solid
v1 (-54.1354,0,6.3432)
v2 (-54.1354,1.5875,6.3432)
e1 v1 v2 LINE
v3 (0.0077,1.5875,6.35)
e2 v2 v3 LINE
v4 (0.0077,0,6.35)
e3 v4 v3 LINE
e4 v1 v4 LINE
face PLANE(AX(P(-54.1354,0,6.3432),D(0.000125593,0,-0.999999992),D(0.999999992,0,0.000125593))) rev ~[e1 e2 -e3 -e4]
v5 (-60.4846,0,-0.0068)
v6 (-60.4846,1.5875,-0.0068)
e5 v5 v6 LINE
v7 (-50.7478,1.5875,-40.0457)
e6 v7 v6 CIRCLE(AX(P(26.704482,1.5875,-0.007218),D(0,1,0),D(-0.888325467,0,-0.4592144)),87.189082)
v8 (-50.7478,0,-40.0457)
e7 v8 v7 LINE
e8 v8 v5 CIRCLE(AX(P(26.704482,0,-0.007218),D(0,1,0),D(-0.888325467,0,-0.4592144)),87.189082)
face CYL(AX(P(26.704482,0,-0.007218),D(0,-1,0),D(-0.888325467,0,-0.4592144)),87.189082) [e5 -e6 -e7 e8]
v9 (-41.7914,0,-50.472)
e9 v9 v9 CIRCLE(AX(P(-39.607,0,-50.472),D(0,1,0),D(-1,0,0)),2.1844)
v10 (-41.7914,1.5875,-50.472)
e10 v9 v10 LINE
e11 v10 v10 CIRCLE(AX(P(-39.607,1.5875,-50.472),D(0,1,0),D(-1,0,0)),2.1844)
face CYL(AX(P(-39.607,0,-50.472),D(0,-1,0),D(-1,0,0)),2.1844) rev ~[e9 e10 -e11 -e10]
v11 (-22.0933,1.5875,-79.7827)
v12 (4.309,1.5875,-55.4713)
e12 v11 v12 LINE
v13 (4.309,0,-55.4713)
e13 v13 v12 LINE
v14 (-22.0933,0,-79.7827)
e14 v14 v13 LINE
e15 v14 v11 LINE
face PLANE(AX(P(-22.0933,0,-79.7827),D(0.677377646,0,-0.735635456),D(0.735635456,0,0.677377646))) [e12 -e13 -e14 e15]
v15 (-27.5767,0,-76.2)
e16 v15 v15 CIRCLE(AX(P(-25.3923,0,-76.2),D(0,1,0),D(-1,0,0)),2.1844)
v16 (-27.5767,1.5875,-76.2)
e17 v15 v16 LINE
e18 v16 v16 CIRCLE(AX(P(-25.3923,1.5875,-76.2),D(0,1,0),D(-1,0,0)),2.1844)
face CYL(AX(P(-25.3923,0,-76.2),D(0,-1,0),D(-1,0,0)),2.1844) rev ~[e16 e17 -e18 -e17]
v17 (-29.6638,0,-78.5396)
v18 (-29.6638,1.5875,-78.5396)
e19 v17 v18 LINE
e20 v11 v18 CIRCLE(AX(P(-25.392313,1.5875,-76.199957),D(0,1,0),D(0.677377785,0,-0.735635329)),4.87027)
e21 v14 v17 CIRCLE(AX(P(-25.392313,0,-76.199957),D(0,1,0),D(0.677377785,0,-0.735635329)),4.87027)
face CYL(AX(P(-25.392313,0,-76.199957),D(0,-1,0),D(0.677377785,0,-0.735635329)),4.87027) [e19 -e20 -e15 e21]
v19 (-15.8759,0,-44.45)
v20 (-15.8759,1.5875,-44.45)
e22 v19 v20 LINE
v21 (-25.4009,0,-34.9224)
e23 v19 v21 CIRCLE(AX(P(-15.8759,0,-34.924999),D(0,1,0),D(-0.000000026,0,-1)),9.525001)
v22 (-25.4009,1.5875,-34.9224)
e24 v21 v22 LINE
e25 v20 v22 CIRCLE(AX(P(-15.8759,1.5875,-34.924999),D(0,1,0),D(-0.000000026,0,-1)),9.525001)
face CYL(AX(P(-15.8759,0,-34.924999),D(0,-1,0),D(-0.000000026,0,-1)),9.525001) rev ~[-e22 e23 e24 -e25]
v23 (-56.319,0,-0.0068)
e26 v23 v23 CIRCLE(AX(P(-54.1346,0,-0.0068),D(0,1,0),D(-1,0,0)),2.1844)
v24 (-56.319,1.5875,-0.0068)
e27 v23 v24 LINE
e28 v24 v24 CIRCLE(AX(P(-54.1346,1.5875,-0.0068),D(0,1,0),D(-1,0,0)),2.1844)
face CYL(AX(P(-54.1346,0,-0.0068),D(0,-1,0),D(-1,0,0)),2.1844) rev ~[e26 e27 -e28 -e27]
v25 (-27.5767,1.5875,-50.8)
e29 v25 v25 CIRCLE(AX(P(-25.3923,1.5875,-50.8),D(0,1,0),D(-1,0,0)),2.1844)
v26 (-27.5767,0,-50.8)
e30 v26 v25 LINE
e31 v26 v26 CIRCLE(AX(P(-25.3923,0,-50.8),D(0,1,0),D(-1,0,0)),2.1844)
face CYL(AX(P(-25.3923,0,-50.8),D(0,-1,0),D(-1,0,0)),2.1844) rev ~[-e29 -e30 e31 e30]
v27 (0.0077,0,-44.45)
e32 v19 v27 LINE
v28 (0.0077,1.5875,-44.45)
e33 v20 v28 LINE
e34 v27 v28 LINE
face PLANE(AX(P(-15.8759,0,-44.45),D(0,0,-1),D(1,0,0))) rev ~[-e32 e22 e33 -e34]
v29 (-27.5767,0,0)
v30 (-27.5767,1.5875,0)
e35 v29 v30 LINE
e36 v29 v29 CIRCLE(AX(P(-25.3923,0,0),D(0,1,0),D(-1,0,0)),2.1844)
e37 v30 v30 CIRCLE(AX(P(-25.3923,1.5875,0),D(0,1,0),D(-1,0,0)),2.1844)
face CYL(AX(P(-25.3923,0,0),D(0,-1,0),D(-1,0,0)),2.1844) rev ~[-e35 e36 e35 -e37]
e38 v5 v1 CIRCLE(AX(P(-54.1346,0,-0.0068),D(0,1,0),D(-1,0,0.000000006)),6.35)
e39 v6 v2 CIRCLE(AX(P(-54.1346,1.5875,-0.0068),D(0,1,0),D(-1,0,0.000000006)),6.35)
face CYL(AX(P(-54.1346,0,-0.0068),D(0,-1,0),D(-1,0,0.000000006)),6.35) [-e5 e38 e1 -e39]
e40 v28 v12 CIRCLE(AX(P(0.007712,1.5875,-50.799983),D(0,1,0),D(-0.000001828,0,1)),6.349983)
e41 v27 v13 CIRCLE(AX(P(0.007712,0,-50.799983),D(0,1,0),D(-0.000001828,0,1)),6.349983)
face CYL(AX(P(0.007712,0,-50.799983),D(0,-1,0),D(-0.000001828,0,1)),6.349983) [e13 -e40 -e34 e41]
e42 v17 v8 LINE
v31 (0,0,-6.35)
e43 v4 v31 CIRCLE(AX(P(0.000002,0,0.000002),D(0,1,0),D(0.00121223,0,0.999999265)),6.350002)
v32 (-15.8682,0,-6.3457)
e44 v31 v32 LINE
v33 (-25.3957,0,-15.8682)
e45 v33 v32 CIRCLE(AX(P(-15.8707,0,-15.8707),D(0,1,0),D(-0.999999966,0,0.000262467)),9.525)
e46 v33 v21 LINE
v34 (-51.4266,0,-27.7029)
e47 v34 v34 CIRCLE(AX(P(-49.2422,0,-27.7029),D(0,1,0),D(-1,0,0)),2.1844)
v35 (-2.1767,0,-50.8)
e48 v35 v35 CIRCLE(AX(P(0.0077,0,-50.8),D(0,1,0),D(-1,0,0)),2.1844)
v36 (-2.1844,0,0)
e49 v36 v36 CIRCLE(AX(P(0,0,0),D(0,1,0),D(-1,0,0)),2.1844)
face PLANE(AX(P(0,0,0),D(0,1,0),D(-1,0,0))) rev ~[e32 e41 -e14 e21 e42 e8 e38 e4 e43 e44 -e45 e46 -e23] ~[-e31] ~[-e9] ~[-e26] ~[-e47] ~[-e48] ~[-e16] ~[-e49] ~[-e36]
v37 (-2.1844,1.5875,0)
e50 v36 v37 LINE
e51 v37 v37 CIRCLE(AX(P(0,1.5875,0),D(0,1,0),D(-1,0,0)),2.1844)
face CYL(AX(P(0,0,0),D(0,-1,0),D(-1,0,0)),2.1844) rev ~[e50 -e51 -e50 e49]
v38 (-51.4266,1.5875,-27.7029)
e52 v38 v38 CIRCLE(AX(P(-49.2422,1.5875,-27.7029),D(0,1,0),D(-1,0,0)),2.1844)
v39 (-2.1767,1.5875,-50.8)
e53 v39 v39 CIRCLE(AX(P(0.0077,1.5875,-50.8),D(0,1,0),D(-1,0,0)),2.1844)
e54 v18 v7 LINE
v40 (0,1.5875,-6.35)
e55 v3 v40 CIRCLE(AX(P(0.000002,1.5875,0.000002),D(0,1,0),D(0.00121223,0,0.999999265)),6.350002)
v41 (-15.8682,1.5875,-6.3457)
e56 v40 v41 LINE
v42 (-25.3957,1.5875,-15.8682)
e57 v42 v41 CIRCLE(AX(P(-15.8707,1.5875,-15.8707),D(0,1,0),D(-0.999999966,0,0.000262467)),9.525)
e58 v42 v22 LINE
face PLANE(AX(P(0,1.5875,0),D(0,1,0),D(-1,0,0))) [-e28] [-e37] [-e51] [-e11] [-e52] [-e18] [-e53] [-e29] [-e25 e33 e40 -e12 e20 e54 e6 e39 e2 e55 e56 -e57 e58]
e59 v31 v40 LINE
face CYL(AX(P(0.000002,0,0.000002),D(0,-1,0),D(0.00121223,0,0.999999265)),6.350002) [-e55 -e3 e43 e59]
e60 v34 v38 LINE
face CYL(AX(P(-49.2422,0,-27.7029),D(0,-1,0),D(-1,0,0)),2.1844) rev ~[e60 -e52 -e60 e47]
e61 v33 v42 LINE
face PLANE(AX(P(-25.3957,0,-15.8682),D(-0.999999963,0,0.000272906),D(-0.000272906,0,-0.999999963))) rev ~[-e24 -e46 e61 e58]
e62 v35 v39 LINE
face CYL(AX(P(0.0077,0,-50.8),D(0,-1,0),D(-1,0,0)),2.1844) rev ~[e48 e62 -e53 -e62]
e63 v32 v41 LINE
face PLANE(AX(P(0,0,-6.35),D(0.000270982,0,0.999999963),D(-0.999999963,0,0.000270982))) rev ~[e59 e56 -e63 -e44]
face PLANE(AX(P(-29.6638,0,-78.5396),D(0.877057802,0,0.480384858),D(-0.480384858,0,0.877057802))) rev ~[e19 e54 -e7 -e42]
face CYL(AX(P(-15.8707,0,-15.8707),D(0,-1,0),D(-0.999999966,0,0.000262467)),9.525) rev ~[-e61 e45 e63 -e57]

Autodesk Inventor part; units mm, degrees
ref_plane "YZ Plane" through (0, 0, 0) normal (1, 0, 0) x (0, 1, 0)
ref_plane "XZ Plane" through (0, 0, 0) normal (0, 1, 0) x (-1, 0, 0)
ref_plane "XY Plane" through (0, 0, 0) normal (0, 0, 1) x (1, 0, 0)
sketch "main" plane through (0, 0, 0) normal (0, 0, 1) x (1, 0, 0)
  line L0 (12.0188, -14.2552) -> (33.1027, 24.2387)
  circle A0 centre (21.9619, 13.8124) radius 2.1844
  circle A1 centre (31.5972, 36.5815) radius 2.1844
  circle A2 centre (36.4896, 64.2776) radius 2.1844
  line L1 (36.4904, 70.6276) -> (-17.6528, 70.6344)
  circle A3 centre (7.7473, 64.2844) radius 2.1844
  line L2 (7.7507, 48.4162) -> (7.7558, 29.3619)
  arc A4 (7.7507, 48.4162) -> (-1.7768, 57.9386) centre (-1.7743, 48.4136) ccw
  arc A5 (-1.7692, 19.8344) -> (7.7558, 29.3619) centre (-1.7692, 29.3594) ccw
  line L3 (-17.645, 57.9344) -> (-1.7768, 57.9386)
  arc A6 (-17.6528, 70.6344) -> (-17.645, 57.9344) centre (-17.645, 64.2844) ccw
  arc A7 (-17.6527, 19.8344) -> (-21.9541, 8.8131) centre (-17.6527, 13.4844) ccw
  circle A8 centre (7.7473, 13.4844) radius 2.1844
  line L4 (-1.7692, 19.8344) -> (-17.6527, 19.8344)
  arc A9 (4.4483, -15.4983) -> (12.0188, -14.2552) centre (7.7473, -11.9156) ccw
  line L5 (4.4483, -15.4983) -> (-21.9541, 8.8131)
  circle A10 centre (7.7473, -11.9156) radius 2.1844
  circle A11 centre (-17.645, 64.2844) radius 2.1844
  circle A12 centre (-17.6527, 13.4844) radius 2.1844
  arc A13 (42.8396, 64.2776) -> (36.4904, 70.6276) centre (36.4896, 64.2776) ccw
  arc A14 (33.1027, 24.2387) -> (42.8396, 64.2776) centre (-44.3506, 64.2776) ccw
  point P0 (10.5119, 26.5593)
  dimension "d1" = 9.7405
  dimension "d2" = 4.3688
  dimension "d3" = 4.3688
  dimension "d4" = 4.3688
  dimension "d5" = 4.3688
  dimension "d6" = 4.3688
  dimension "d10" = 50.8
  dimension "d11" = 50.8
  dimension "d13" = 6.35
sketch "Sketch1" plane through (0, 0, 0) normal (0, 1, 0) x (-1, 0, 0)
  line L0 (29.6638, -78.5396) -> (50.7478, -40.0457)
  circle A0 centre (39.607, -50.472) radius 2.1844
  circle A1 centre (49.2422, -27.7029) radius 2.1844
  circle A2 centre (54.1346, -0.0068) radius 2.1844
  line L1 (54.1354, 6.3432) -> (-0.0077, 6.35)
  circle A3 centre (25.3923, 0) radius 2.1844
  line L2 (25.3957, -15.8682) -> (25.4009, -34.9224)
  arc A4 (25.3957, -15.8682) -> (15.8682, -6.3457) centre (15.8707, -15.8707) ccw
  arc A5 (15.8759, -44.45) -> (25.4009, -34.9224) centre (15.8759, -34.925) ccw
  line L3 (0, -6.35) -> (15.8682, -6.3457)
  arc A6 (-0.0077, 6.35) -> (0, -6.35) centre (0, 0) ccw
  arc A7 (-0.0077, -44.45) -> (-4.309, -55.4713) centre (-0.0077, -50.8) ccw
  circle A8 centre (25.3923, -50.8) radius 2.1844
  line L4 (15.8759, -44.45) -> (-0.0077, -44.45)
  arc A9 (22.0933, -79.7827) -> (29.6638, -78.5396) centre (25.3923, -76.2) ccw
  line L5 (22.0933, -79.7827) -> (-4.309, -55.4713)
  circle A10 centre (25.3923, -76.2) radius 2.1844
  circle A11 centre (0, 0) radius 2.1844
  circle A12 centre (-0.0077, -50.8) radius 2.1844
  arc A13 (60.4846, -0.0068) -> (54.1354, 6.3432) centre (54.1346, -0.0068) ccw
  arc A14 (50.7478, -40.0457) -> (60.4846, -0.0068) centre (-26.7056, -0.0068) ccw
extrude "Extrusion1" add sketch "Sketch1" along normal blind 1.5875
properties part number "Funnel Gusset Back Improved V2" material "Acetal Resin, White"
